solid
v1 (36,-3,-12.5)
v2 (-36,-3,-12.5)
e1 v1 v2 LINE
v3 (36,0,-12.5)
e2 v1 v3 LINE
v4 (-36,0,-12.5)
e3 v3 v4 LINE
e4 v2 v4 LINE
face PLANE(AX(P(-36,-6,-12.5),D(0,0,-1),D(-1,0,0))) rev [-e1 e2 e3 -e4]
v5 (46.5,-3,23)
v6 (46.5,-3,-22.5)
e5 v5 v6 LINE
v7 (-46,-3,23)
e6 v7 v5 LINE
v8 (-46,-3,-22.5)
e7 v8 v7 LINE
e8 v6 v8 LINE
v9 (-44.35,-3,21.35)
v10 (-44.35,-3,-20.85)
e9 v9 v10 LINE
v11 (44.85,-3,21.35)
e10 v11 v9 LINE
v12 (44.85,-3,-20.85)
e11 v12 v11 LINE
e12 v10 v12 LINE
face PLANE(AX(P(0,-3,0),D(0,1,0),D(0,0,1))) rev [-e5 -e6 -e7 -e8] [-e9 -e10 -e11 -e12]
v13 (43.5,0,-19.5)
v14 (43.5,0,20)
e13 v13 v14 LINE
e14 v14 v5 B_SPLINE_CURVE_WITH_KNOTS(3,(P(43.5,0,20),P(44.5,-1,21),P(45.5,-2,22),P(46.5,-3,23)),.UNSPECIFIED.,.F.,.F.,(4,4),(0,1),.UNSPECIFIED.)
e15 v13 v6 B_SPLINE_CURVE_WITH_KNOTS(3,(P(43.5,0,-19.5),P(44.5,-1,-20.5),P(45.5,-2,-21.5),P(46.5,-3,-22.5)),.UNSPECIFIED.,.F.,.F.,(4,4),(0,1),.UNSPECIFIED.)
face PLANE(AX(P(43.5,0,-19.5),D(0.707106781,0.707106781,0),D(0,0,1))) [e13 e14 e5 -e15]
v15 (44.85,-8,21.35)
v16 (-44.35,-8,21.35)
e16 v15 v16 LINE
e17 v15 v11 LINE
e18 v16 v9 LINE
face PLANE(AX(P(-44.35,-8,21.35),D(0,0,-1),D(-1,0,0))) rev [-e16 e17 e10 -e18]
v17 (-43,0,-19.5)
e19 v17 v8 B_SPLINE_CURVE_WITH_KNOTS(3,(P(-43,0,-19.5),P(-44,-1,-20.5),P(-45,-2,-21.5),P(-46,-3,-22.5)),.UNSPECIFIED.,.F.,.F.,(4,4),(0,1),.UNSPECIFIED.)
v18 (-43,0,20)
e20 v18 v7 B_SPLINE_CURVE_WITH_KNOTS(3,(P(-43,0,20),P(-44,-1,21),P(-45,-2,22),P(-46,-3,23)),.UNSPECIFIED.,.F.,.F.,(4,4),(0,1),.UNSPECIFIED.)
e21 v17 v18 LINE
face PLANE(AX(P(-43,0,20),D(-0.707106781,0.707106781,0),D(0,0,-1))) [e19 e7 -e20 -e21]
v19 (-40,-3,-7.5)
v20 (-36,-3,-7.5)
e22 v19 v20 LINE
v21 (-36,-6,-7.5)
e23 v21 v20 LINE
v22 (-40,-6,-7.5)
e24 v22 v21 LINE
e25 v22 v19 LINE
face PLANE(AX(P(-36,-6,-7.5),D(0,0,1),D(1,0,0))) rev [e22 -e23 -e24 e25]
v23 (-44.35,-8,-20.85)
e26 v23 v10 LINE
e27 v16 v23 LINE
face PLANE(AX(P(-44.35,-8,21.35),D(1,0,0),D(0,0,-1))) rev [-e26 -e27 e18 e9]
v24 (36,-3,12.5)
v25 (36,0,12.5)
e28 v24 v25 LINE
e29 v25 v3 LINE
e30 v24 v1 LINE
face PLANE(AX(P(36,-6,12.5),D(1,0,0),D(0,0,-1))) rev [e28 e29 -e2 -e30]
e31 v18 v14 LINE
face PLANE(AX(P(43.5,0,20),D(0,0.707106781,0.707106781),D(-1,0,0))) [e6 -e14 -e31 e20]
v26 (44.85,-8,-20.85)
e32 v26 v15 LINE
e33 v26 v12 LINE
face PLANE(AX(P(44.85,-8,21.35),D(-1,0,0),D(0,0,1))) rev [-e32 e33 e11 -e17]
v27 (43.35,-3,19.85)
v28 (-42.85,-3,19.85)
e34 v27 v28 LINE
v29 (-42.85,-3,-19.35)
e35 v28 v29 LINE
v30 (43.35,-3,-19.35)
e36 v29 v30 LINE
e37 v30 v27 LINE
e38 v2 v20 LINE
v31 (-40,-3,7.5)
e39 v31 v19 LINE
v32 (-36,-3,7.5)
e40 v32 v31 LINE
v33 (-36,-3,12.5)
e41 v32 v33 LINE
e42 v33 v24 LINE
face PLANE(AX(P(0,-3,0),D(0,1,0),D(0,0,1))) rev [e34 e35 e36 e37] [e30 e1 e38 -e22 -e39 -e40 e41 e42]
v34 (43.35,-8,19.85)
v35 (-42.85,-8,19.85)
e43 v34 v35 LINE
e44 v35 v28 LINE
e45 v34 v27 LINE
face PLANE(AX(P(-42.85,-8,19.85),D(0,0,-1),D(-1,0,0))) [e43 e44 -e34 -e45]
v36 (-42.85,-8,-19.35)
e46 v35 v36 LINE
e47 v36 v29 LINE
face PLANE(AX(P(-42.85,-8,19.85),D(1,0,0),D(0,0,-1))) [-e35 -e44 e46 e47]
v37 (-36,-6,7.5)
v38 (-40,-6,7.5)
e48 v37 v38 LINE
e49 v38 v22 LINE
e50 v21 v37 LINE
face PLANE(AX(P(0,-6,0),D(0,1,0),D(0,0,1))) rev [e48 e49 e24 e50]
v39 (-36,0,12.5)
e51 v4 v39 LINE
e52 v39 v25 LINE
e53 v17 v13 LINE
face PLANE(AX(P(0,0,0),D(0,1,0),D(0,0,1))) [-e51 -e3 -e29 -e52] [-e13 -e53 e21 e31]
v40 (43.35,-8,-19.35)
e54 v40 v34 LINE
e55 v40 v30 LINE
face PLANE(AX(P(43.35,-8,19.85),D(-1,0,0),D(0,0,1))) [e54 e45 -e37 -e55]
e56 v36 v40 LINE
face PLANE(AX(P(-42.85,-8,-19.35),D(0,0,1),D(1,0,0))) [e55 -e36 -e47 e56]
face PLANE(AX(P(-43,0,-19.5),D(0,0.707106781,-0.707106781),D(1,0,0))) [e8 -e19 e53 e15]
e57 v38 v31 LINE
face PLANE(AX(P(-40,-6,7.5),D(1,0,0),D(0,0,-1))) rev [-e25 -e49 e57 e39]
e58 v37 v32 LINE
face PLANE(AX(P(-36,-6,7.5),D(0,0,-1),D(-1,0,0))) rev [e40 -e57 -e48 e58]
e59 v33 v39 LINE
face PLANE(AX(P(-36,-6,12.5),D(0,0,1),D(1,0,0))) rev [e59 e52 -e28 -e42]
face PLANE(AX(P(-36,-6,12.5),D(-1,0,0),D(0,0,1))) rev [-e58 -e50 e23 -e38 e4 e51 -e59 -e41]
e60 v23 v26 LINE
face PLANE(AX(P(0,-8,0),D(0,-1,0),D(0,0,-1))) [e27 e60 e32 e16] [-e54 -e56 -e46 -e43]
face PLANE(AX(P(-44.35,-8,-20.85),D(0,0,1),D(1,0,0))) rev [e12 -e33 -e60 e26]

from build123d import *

# Parameters (mm, degrees)
TOP_EDGE_OUTLINE_W   = 86.5
TOP_EDGE_OUTLINE_H   = 39.5
TOP_EDGE_DEPTH       = 3
TOP_EDGE_DRAFT       = 45
SKETCH13_W           = 72
SKETCH13_H           = 25
DISPLAY_HOLE_DEPTH   = 6
SKETCH14_W           = 92.5
SKETCH14_H           = 45.5
SKETCH14_W_2         = 89.5
SKETCH14_H_2         = 42.5
BOSS_EXTRUDE5_DEPTH  = 5
SKETCH15_W           = 128.5
SKETCH15_H           = 45.5
SKETCH15_W_2         = 89.5
SKETCH15_H_2         = 42.5
BOSS_EXTRUDE6_DEPTH  = 2
SKETCH16_W           = 128.5
SKETCH16_H           = 45.5
SKETCH16_W_2         = 125.5
SKETCH16_H_2         = 42.5
BOSS_EXTRUDE7_DEPTH  = 37
LOFT2_OUTLINE_W      = 33
LOFT2_OUTLINE_H      = 42.5
LOFT2_DEPTH          = 1.5
LOFT2_DRAFT          = 45
SKETCH19_R           = 2.75
SKETCH19_R_2         = 2
BOSS_EXTRUDE8_DEPTH  = 1
CUT_EXTRUDE3_START   = -11
SKETCH20_R           = 2
CUT_EXTRUDE3_DEPTH   = 11
SKETCH21_W           = 12
SKETCH21_H           = 8
CUT_EXTRUDE4_DEPTH   = 11
SKETCH22_W           = 4
SKETCH22_H           = 15
BOSS_EXTRUDE9_DEPTH  = 3
SKETCH24_W           = 42.5
SKETCH24_H           = 37
CUT_EXTRUDE5_DEPTH   = 17
SKETCH26_W           = 65.330388672
SKETCH26_H           = 66.528532866
CUT_EXTRUDE6_DEPTH   = 47
SKETCH27_W           = 135.174847233
SKETCH27_H           = 89.815373094
CUT_EXTRUDE7_DEPTH   = 47
SKETCH28_W           = 107.897480511
SKETCH28_H           = 56.576939502
SKETCH28_W_2         = 83.398406197
SKETCH28_H_2         = 34.654132256
CUT_EXTRUDE9_DEPTH   = 20.5
SKETCH29_W           = 89.2
SKETCH29_H           = 42.2
SKETCH29_W_2         = 86.2
SKETCH29_H_2         = 39.2
BOSS_EXTRUDE11_DEPTH = 5


# Read off the part's stored shape, not the designer's step: Top Edge, Loft2
with BuildPart() as part:
    # Top Edge outline → Top Edge (with draft: the straight prism first)
    with BuildSketch(Plane(origin=(0, 0, 0), x_dir=(1, 0, 0), z_dir=(0, 1, 0))):
        with Locations((0.25, -0.25)):
            Rectangle(TOP_EDGE_OUTLINE_W, TOP_EDGE_OUTLINE_H)
    extrude(amount=-TOP_EDGE_DEPTH)
    # Top Edge: the draft: its side faces are tilted about the plane it starts from
    top_edge_sides = [part.faces().sort_by_distance(p)[0] for p in [
        (-43, -1.5, 0.25),
        (0.25, -1.5, 20),
        (43.5, -1.5, 0.25),
        (0.25, -1.5, -19.5),
    ]]
    draft(top_edge_sides, Plane(origin=(0, 0, 0), x_dir=(1, 0, 0), z_dir=(0, 1, 0)), TOP_EDGE_DRAFT)

    # Sketch13 → Display Hole (cut)
    with BuildSketch(Plane(origin=(0, 0, 0), x_dir=(1, 0, 0), z_dir=(0, 1, 0))):
        Rectangle(SKETCH13_W, SKETCH13_H)
    extrude(amount=-DISPLAY_HOLE_DEPTH, mode=Mode.SUBTRACT)

    # Sketch14 → Boss-Extrude5 (add)
    with BuildSketch(Plane.XZ.offset(3)):
        with Locations((0.25, 0.25)):
            Rectangle(SKETCH14_W, SKETCH14_H)
        with Locations((0.25, 0.25)):
            Rectangle(SKETCH14_W_2, SKETCH14_H_2, mode=Mode.SUBTRACT)
    extrude(amount=BOSS_EXTRUDE5_DEPTH)

    # Sketch15 → Boss-Extrude6 (add)
    with BuildSketch(Plane.XZ.offset(8)):
        with Locations((18.25, 0.25)):
            Rectangle(SKETCH15_W, SKETCH15_H)
        with Locations((0.25, 0.25)):
            Rectangle(SKETCH15_W_2, SKETCH15_H_2, mode=Mode.SUBTRACT)
    extrude(amount=BOSS_EXTRUDE6_DEPTH)

    # Sketch16 → Boss-Extrude7 (add)
    with BuildSketch(Plane.XZ.offset(10)):
        with Locations((18.25, 0.25)):
            Rectangle(SKETCH16_W, SKETCH16_H)
        with Locations((18.25, 0.25)):
            Rectangle(SKETCH16_W_2, SKETCH16_H_2, mode=Mode.SUBTRACT)
    extrude(amount=BOSS_EXTRUDE7_DEPTH)


with BuildPart() as loft2_tool:
    # Loft2 outline → Loft2 (with draft: the straight prism first)
    with BuildSketch(Plane(origin=(0, -6.5, 0), x_dir=(1, 0, 0), z_dir=(0, 1, 0))):
        with Locations((64.5, -0.25)):
            Rectangle(LOFT2_OUTLINE_W, LOFT2_OUTLINE_H)
    extrude(amount=-LOFT2_DEPTH)
    # Loft2: the draft: its side faces are tilted about the plane it starts from
    loft2_sides = [loft2_tool.faces().sort_by_distance(p)[0] for p in [
        (81, -7.25, 0.25),
        (64.5, -7.25, -21),
        (48, -7.25, 0.25),
        (64.5, -7.25, 21.5),
    ]]
    draft(loft2_sides, Plane(origin=(0, -6.5, 0), x_dir=(1, 0, 0), z_dir=(0, 1, 0)), LOFT2_DRAFT)


with BuildPart() as part_1:
    add(part.part)

    # Loft2: add loft2_tool
    add(loft2_tool.part)

    # Sketch19 → Boss-Extrude8 (add)
    with BuildSketch(Plane(origin=(0, -6.5, 0), x_dir=(1, 0, 0), z_dir=(0, 1, 0))):
        with Locations(Location((64.5, 3, 0), (0, 0, 270))):
            Circle(SKETCH19_R)
        with Locations(Location((64.5, 3, 0), (0, 0, 270))):
            Circle(SKETCH19_R_2, mode=Mode.SUBTRACT)
    extrude(amount=BOSS_EXTRUDE8_DEPTH)

    # Sketch20 → Cut-Extrude3 (cut)
    with BuildSketch(Plane(origin=(0, -6.5, 0), x_dir=(1, 0, 0), z_dir=(0, 1, 0)).offset(CUT_EXTRUDE3_START)):
        with Locations(Location((64.5, 3, 0), (0, 0, 90))):
            Circle(SKETCH20_R)
    extrude(amount=CUT_EXTRUDE3_DEPTH, mode=Mode.SUBTRACT)

    # Sketch21 → Cut-Extrude4 (cut)
    with BuildSketch(Plane(origin=(82.5, 0, 0), x_dir=(0, 0, -1), z_dir=(1, 0, 0))):
        with Locations((0, -43)):
            Rectangle(SKETCH21_W, SKETCH21_H)
    extrude(amount=-CUT_EXTRUDE4_DEPTH, mode=Mode.SUBTRACT)

    # Sketch22 → Boss-Extrude9 (add)
    with BuildSketch(Plane.XZ.offset(3)):
        with Locations((-38, 0)):
            Rectangle(SKETCH22_W, SKETCH22_H)
    extrude(amount=BOSS_EXTRUDE9_DEPTH)

    # Sketch24 → Cut-Extrude5 (cut)
    with BuildSketch(Plane.ZY.offset(-81)):
        with Locations((0.25, -28.5)):
            Rectangle(SKETCH24_W, SKETCH24_H)
    extrude(amount=-CUT_EXTRUDE5_DEPTH, mode=Mode.SUBTRACT)

    # Sketch26 → Cut-Extrude6 (cut)
    with BuildSketch(Plane(origin=(46.5, 0, 0), x_dir=(0, 0, -1), z_dir=(1, 0, 0))):
        with Locations((4.479516554, -23.405372169)):
            Rectangle(SKETCH26_W, SKETCH26_H)
    extrude(amount=CUT_EXTRUDE6_DEPTH, mode=Mode.SUBTRACT)

    # Sketch27 → Cut-Extrude7 (cut)
    with BuildSketch(Plane.XZ.offset(10)):
        with Locations((-2.496201378, -4.177518392)):
            Rectangle(SKETCH27_W, SKETCH27_H)
    extrude(amount=CUT_EXTRUDE7_DEPTH, mode=Mode.SUBTRACT)

    # Sketch28 → Cut-Extrude9 (cut)
    with BuildSketch(Plane.XZ.offset(3)):
        with Locations((0.925246346, -0.196985684)):
            Rectangle(SKETCH28_W, SKETCH28_H)
        with Locations((-0.40760533, 0.012173471)):
            Rectangle(SKETCH28_W_2, SKETCH28_H_2, mode=Mode.SUBTRACT)
    extrude(amount=CUT_EXTRUDE9_DEPTH, mode=Mode.SUBTRACT)

    # Sketch29 → Boss-Extrude11 (add)
    with BuildSketch(Plane.XZ.offset(3)):
        with Locations((0.25, 0.25)):
            Rectangle(SKETCH29_W, SKETCH29_H)
        with Locations((0.25, 0.25)):
            Rectangle(SKETCH29_W_2, SKETCH29_H_2, mode=Mode.SUBTRACT)
    extrude(amount=BOSS_EXTRUDE11_DEPTH)


solid = part_1.part
